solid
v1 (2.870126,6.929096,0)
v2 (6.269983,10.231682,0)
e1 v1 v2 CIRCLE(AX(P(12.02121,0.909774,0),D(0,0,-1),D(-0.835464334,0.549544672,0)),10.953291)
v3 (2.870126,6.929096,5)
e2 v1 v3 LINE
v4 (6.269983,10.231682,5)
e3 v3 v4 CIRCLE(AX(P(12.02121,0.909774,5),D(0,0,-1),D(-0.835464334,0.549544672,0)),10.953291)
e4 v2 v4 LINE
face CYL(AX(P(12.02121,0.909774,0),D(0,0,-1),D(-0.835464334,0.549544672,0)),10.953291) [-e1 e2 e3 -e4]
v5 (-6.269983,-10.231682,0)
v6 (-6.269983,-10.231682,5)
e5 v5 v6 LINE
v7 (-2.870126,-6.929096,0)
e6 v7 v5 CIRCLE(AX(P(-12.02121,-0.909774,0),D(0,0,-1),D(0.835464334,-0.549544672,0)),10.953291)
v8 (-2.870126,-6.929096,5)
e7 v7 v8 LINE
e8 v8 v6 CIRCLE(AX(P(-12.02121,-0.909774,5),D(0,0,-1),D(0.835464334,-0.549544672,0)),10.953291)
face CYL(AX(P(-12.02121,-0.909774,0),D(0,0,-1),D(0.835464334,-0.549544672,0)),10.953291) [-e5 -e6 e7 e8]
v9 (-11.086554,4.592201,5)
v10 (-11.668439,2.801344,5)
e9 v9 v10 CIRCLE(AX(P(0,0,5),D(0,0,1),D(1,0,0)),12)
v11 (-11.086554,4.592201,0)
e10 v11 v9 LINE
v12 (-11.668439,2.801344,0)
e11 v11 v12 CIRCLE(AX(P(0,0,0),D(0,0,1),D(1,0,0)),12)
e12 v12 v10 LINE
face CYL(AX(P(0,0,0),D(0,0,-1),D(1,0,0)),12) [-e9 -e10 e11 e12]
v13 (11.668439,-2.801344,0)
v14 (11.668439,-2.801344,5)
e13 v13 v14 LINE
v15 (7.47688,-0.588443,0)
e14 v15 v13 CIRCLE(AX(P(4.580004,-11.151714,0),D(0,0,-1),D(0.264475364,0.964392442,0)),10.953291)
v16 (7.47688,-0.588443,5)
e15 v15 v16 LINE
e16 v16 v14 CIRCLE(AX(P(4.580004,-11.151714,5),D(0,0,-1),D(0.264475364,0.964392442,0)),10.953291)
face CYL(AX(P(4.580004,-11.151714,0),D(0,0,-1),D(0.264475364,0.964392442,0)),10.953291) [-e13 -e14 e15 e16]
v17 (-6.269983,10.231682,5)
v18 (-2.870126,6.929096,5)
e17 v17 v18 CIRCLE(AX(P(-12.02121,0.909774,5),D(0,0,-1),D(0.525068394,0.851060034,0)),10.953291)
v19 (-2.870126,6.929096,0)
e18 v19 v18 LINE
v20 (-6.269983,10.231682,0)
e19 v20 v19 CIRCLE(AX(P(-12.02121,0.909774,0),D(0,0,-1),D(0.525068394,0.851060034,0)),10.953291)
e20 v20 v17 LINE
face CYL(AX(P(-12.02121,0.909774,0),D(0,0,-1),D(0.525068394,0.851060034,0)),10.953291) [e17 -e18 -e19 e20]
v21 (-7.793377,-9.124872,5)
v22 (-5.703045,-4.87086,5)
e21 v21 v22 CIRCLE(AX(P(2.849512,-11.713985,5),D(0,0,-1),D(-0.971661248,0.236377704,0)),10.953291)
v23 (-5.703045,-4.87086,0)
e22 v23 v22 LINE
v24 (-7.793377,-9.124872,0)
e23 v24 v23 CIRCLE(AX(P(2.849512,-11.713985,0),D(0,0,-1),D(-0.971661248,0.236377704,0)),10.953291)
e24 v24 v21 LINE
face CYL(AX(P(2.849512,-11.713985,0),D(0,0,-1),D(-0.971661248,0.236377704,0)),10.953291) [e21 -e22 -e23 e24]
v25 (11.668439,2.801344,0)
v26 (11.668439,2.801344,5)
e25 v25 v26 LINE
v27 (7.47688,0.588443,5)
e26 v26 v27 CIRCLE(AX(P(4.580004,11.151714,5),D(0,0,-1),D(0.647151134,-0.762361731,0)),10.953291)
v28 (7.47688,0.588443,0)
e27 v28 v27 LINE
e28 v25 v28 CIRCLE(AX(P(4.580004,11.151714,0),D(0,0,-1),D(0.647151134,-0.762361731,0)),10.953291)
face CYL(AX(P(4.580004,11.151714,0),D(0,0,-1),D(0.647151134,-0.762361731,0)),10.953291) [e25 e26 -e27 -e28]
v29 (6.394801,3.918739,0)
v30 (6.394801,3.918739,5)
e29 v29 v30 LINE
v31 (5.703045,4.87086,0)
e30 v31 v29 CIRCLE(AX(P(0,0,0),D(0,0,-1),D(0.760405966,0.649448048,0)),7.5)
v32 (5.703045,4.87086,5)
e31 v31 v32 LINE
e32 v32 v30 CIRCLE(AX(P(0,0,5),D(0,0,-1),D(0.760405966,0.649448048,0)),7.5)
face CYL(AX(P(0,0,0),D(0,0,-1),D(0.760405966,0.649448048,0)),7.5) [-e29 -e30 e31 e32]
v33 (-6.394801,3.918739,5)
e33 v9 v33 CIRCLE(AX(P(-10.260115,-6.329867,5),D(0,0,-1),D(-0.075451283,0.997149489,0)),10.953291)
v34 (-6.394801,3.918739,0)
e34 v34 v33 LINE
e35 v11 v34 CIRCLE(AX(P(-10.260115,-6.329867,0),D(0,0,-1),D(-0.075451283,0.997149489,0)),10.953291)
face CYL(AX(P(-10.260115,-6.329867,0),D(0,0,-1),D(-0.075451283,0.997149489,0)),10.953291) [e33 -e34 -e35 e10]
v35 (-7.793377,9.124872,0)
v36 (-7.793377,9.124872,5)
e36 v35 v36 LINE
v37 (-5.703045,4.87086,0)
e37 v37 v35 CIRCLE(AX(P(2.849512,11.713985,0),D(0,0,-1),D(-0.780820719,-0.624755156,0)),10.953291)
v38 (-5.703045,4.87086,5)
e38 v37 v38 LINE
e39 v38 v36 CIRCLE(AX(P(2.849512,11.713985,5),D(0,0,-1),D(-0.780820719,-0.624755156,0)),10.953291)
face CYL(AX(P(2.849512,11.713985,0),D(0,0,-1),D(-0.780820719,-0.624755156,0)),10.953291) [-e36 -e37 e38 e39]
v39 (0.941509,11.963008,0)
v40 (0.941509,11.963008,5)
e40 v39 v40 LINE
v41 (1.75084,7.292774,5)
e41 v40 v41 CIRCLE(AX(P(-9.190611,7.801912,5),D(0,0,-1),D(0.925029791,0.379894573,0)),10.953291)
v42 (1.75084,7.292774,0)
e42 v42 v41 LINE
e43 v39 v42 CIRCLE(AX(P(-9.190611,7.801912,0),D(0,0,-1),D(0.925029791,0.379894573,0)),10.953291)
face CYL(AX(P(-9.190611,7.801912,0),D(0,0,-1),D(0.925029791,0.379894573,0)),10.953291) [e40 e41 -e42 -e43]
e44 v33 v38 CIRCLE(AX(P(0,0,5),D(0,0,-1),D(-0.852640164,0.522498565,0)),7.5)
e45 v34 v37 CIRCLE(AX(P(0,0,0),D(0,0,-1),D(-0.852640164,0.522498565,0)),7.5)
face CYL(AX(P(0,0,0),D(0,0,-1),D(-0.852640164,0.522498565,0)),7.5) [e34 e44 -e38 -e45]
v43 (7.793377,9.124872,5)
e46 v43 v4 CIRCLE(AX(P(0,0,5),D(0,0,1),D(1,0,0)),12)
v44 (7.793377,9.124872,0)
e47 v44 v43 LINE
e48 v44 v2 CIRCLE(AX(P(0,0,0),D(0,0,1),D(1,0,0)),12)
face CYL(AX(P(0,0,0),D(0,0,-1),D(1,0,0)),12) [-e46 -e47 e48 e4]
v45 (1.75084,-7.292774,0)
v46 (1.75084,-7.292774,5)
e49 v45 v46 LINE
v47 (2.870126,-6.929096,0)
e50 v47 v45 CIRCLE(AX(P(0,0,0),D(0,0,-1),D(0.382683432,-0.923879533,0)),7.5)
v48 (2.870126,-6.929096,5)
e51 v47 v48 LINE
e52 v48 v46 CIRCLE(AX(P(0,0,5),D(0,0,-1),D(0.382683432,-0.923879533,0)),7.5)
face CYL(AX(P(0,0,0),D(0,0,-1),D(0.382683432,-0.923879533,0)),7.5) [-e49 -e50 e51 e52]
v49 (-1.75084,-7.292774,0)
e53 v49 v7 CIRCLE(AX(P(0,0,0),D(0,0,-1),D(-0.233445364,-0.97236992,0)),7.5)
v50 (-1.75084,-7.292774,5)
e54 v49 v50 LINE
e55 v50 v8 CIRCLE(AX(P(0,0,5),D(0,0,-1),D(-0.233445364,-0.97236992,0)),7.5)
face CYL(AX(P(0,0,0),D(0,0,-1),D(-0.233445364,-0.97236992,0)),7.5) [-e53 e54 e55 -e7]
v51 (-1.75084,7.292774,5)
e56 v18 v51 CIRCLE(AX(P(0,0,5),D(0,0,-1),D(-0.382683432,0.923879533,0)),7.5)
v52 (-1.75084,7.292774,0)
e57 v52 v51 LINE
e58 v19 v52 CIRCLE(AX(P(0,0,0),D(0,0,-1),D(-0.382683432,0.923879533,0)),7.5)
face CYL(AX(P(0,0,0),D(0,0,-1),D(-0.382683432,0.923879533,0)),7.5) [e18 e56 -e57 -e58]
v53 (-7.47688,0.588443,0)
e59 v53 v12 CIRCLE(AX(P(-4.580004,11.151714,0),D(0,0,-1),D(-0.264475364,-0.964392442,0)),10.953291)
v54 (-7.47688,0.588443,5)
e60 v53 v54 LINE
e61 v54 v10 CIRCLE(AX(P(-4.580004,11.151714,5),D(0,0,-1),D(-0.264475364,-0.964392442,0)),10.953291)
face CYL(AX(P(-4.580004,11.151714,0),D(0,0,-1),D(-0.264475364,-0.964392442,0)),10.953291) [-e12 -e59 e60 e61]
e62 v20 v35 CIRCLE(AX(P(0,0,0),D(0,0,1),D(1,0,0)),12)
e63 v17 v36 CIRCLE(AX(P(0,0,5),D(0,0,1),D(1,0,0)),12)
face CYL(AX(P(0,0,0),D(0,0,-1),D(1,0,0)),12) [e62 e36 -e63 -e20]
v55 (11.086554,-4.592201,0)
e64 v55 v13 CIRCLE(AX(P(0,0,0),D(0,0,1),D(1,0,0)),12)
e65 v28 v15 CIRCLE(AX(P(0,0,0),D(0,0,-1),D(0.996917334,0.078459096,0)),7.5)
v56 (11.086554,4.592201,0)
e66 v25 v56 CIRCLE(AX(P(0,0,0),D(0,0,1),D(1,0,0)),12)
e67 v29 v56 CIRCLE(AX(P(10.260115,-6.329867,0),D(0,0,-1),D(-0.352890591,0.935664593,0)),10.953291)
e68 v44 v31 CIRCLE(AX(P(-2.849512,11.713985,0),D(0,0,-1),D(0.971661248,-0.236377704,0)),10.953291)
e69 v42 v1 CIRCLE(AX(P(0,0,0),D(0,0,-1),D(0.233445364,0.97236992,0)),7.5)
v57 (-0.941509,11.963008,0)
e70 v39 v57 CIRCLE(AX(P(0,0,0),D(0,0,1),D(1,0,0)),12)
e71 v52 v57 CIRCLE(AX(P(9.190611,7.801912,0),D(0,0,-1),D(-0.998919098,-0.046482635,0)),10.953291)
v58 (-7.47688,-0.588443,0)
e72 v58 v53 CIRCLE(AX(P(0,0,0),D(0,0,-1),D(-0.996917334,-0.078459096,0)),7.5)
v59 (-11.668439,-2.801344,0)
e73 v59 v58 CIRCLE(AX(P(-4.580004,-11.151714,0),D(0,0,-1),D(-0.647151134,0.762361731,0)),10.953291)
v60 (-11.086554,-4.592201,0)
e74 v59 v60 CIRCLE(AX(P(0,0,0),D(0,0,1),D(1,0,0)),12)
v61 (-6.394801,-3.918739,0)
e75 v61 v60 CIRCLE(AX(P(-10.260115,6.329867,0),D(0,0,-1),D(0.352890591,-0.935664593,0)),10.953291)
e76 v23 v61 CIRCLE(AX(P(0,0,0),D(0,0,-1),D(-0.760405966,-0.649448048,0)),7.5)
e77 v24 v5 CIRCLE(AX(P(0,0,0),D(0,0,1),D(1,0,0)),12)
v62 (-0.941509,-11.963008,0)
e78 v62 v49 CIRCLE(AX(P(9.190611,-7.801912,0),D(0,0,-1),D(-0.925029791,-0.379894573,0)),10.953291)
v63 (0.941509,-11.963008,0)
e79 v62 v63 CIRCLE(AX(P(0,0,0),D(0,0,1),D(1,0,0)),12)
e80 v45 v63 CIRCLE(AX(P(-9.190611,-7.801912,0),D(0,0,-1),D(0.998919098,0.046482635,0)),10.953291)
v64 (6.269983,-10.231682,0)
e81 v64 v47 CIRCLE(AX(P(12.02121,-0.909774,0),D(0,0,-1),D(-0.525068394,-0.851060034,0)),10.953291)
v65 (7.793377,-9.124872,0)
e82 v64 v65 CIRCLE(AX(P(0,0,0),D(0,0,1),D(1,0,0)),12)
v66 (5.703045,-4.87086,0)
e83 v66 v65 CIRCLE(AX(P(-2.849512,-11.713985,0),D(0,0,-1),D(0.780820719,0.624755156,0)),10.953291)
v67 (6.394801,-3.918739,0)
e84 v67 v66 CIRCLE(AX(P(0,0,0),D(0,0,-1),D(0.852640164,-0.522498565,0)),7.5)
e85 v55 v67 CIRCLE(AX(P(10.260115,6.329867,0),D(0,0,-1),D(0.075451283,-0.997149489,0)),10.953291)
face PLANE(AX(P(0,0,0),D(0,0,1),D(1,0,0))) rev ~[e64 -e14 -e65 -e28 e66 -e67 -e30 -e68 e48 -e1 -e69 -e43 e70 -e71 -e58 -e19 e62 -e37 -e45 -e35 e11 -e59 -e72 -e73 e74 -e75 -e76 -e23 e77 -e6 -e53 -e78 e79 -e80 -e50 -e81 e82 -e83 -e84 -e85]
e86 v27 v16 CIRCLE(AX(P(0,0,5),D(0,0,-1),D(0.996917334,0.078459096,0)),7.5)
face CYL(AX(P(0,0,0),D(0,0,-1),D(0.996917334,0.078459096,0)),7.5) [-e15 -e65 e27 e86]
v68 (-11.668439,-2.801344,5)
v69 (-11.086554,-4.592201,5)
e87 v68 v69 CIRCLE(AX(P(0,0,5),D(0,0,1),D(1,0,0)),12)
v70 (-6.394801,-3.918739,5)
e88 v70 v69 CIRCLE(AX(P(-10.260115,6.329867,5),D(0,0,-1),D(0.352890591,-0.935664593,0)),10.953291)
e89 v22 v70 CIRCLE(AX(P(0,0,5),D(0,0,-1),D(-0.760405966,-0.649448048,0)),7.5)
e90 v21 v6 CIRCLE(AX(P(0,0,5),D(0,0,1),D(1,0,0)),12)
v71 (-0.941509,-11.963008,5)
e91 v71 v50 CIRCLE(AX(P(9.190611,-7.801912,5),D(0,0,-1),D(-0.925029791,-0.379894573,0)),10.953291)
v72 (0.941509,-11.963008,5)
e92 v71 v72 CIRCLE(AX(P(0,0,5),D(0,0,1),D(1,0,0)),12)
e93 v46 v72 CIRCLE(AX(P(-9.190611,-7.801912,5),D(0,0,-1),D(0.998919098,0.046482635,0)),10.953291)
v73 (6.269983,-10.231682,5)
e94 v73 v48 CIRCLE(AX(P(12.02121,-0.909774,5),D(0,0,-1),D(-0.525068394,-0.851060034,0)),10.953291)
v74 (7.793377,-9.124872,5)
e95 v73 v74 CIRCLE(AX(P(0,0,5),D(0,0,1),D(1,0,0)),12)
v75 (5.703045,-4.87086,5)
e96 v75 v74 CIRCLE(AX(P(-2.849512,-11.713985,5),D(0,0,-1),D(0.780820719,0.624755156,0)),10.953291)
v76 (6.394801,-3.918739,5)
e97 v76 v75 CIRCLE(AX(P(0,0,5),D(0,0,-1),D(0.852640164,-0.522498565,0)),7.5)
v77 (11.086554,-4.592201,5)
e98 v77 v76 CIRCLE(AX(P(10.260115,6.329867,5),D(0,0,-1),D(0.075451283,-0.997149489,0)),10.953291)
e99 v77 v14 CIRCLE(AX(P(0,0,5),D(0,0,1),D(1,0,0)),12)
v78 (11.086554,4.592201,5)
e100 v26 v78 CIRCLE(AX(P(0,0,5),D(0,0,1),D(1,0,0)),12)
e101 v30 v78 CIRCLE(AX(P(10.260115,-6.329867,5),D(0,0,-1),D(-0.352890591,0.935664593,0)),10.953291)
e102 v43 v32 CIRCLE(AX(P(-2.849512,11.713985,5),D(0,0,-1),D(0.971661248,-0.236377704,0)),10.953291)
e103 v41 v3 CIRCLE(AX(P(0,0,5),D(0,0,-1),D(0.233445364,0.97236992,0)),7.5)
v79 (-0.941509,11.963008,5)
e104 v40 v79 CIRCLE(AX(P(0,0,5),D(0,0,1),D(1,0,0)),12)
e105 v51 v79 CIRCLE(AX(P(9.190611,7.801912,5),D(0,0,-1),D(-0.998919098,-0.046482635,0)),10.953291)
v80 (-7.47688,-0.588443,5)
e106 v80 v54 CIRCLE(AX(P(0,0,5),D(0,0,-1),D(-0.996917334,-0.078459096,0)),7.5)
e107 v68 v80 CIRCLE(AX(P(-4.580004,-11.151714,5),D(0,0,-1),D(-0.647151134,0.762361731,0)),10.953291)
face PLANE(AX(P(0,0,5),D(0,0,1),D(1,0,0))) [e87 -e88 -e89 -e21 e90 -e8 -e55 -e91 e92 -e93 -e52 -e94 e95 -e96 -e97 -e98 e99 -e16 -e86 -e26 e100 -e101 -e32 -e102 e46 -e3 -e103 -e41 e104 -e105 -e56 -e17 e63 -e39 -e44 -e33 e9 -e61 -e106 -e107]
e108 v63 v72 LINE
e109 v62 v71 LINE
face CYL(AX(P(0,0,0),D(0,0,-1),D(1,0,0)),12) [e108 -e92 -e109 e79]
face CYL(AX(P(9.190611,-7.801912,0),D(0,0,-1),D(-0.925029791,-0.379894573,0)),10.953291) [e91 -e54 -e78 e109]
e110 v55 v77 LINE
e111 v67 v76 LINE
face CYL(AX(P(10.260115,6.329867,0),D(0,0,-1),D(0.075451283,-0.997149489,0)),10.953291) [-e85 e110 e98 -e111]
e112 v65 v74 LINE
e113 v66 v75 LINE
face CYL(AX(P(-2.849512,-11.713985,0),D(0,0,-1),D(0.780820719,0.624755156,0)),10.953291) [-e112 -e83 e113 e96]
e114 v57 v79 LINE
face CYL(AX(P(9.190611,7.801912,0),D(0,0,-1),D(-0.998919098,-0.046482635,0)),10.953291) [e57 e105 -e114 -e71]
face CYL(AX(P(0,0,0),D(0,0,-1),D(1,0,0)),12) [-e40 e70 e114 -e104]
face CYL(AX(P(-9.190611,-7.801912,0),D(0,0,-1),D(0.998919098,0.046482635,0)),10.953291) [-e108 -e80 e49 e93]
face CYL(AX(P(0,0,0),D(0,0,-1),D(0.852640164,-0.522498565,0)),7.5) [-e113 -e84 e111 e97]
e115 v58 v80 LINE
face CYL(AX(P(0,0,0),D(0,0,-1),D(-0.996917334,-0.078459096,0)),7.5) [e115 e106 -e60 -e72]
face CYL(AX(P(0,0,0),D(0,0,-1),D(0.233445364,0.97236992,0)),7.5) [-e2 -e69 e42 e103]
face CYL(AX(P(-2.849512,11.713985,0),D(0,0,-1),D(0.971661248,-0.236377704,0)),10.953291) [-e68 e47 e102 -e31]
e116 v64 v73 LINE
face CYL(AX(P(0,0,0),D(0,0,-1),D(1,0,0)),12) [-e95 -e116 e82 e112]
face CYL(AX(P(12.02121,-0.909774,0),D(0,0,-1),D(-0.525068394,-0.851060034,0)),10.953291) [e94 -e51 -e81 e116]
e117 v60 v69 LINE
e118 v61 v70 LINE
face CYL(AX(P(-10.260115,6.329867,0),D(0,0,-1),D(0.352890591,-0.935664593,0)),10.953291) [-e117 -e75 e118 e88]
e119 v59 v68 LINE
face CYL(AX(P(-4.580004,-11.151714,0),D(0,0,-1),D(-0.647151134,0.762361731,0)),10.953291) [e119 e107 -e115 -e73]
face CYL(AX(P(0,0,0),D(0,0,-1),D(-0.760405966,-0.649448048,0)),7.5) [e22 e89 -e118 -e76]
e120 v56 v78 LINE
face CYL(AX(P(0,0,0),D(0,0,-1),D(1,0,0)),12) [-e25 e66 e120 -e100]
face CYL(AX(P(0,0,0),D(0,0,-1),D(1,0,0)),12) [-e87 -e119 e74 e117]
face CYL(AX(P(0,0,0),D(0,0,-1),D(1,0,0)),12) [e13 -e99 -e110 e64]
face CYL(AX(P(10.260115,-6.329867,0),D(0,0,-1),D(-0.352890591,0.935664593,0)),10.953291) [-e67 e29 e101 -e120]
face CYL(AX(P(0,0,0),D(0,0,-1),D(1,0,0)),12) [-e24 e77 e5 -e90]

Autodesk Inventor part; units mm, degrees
sketch "Sketch1" plane through (0, 0, 0) normal (0, 0, 1) x (1, 0, 0)
  circle A0 centre (0, 0) radius 12
  dimension "d0" = 24
extrude "Extrusion1" add sketch "Sketch1" along normal blind 5
ref_plane "Work Plane2" through (0, 0, 2.5) normal (0, 0, 1) x (1, 0, 0)
sketch "Sketch2" plane through (0, 0, 0) normal (0, 0, -1) x (-1, 0, 0)
  circle A0 centre (0, 0) radius 12 projected
  circle A1 centre (0, 0) radius 10
  dimension "d3" = 20
surface extrude "Pitch Diameter" sketch "Sketch2" against normal through all shown no curves A1
ref_plane "Work Plane8" through (0, 0, 0) normal (0.9510565, 0.309017, 0) x (0, 0, 1)
ref_plane "Work Plane9" through (0, 0, 0) normal (1, 0, 0) x (0, 1, 0)
spur gear teeth "Spur Gear" teeth 10 pitch diameter 20 tip diameter 24 root diameter 15 face width 5 start plane through (0, 0, 0) normal (0, 0, -1) x (-1, 0, 0)
equation "\"d0\" = da_da"
equation "\"d1\" = da_b"
equation "\"d3\" = da_d"
equation "\"d16\" = da_aw"
equation "\"d43\" = da_aw"
equation "\"d46\" = da_aw"
equation "\"da_da\" = 24"
equation "\"da_b\" = 5"
equation "\"da_d\" = 20"
equation "\"da_aw\" = 35"
properties part number "Spur Gear1" material "Steel"
